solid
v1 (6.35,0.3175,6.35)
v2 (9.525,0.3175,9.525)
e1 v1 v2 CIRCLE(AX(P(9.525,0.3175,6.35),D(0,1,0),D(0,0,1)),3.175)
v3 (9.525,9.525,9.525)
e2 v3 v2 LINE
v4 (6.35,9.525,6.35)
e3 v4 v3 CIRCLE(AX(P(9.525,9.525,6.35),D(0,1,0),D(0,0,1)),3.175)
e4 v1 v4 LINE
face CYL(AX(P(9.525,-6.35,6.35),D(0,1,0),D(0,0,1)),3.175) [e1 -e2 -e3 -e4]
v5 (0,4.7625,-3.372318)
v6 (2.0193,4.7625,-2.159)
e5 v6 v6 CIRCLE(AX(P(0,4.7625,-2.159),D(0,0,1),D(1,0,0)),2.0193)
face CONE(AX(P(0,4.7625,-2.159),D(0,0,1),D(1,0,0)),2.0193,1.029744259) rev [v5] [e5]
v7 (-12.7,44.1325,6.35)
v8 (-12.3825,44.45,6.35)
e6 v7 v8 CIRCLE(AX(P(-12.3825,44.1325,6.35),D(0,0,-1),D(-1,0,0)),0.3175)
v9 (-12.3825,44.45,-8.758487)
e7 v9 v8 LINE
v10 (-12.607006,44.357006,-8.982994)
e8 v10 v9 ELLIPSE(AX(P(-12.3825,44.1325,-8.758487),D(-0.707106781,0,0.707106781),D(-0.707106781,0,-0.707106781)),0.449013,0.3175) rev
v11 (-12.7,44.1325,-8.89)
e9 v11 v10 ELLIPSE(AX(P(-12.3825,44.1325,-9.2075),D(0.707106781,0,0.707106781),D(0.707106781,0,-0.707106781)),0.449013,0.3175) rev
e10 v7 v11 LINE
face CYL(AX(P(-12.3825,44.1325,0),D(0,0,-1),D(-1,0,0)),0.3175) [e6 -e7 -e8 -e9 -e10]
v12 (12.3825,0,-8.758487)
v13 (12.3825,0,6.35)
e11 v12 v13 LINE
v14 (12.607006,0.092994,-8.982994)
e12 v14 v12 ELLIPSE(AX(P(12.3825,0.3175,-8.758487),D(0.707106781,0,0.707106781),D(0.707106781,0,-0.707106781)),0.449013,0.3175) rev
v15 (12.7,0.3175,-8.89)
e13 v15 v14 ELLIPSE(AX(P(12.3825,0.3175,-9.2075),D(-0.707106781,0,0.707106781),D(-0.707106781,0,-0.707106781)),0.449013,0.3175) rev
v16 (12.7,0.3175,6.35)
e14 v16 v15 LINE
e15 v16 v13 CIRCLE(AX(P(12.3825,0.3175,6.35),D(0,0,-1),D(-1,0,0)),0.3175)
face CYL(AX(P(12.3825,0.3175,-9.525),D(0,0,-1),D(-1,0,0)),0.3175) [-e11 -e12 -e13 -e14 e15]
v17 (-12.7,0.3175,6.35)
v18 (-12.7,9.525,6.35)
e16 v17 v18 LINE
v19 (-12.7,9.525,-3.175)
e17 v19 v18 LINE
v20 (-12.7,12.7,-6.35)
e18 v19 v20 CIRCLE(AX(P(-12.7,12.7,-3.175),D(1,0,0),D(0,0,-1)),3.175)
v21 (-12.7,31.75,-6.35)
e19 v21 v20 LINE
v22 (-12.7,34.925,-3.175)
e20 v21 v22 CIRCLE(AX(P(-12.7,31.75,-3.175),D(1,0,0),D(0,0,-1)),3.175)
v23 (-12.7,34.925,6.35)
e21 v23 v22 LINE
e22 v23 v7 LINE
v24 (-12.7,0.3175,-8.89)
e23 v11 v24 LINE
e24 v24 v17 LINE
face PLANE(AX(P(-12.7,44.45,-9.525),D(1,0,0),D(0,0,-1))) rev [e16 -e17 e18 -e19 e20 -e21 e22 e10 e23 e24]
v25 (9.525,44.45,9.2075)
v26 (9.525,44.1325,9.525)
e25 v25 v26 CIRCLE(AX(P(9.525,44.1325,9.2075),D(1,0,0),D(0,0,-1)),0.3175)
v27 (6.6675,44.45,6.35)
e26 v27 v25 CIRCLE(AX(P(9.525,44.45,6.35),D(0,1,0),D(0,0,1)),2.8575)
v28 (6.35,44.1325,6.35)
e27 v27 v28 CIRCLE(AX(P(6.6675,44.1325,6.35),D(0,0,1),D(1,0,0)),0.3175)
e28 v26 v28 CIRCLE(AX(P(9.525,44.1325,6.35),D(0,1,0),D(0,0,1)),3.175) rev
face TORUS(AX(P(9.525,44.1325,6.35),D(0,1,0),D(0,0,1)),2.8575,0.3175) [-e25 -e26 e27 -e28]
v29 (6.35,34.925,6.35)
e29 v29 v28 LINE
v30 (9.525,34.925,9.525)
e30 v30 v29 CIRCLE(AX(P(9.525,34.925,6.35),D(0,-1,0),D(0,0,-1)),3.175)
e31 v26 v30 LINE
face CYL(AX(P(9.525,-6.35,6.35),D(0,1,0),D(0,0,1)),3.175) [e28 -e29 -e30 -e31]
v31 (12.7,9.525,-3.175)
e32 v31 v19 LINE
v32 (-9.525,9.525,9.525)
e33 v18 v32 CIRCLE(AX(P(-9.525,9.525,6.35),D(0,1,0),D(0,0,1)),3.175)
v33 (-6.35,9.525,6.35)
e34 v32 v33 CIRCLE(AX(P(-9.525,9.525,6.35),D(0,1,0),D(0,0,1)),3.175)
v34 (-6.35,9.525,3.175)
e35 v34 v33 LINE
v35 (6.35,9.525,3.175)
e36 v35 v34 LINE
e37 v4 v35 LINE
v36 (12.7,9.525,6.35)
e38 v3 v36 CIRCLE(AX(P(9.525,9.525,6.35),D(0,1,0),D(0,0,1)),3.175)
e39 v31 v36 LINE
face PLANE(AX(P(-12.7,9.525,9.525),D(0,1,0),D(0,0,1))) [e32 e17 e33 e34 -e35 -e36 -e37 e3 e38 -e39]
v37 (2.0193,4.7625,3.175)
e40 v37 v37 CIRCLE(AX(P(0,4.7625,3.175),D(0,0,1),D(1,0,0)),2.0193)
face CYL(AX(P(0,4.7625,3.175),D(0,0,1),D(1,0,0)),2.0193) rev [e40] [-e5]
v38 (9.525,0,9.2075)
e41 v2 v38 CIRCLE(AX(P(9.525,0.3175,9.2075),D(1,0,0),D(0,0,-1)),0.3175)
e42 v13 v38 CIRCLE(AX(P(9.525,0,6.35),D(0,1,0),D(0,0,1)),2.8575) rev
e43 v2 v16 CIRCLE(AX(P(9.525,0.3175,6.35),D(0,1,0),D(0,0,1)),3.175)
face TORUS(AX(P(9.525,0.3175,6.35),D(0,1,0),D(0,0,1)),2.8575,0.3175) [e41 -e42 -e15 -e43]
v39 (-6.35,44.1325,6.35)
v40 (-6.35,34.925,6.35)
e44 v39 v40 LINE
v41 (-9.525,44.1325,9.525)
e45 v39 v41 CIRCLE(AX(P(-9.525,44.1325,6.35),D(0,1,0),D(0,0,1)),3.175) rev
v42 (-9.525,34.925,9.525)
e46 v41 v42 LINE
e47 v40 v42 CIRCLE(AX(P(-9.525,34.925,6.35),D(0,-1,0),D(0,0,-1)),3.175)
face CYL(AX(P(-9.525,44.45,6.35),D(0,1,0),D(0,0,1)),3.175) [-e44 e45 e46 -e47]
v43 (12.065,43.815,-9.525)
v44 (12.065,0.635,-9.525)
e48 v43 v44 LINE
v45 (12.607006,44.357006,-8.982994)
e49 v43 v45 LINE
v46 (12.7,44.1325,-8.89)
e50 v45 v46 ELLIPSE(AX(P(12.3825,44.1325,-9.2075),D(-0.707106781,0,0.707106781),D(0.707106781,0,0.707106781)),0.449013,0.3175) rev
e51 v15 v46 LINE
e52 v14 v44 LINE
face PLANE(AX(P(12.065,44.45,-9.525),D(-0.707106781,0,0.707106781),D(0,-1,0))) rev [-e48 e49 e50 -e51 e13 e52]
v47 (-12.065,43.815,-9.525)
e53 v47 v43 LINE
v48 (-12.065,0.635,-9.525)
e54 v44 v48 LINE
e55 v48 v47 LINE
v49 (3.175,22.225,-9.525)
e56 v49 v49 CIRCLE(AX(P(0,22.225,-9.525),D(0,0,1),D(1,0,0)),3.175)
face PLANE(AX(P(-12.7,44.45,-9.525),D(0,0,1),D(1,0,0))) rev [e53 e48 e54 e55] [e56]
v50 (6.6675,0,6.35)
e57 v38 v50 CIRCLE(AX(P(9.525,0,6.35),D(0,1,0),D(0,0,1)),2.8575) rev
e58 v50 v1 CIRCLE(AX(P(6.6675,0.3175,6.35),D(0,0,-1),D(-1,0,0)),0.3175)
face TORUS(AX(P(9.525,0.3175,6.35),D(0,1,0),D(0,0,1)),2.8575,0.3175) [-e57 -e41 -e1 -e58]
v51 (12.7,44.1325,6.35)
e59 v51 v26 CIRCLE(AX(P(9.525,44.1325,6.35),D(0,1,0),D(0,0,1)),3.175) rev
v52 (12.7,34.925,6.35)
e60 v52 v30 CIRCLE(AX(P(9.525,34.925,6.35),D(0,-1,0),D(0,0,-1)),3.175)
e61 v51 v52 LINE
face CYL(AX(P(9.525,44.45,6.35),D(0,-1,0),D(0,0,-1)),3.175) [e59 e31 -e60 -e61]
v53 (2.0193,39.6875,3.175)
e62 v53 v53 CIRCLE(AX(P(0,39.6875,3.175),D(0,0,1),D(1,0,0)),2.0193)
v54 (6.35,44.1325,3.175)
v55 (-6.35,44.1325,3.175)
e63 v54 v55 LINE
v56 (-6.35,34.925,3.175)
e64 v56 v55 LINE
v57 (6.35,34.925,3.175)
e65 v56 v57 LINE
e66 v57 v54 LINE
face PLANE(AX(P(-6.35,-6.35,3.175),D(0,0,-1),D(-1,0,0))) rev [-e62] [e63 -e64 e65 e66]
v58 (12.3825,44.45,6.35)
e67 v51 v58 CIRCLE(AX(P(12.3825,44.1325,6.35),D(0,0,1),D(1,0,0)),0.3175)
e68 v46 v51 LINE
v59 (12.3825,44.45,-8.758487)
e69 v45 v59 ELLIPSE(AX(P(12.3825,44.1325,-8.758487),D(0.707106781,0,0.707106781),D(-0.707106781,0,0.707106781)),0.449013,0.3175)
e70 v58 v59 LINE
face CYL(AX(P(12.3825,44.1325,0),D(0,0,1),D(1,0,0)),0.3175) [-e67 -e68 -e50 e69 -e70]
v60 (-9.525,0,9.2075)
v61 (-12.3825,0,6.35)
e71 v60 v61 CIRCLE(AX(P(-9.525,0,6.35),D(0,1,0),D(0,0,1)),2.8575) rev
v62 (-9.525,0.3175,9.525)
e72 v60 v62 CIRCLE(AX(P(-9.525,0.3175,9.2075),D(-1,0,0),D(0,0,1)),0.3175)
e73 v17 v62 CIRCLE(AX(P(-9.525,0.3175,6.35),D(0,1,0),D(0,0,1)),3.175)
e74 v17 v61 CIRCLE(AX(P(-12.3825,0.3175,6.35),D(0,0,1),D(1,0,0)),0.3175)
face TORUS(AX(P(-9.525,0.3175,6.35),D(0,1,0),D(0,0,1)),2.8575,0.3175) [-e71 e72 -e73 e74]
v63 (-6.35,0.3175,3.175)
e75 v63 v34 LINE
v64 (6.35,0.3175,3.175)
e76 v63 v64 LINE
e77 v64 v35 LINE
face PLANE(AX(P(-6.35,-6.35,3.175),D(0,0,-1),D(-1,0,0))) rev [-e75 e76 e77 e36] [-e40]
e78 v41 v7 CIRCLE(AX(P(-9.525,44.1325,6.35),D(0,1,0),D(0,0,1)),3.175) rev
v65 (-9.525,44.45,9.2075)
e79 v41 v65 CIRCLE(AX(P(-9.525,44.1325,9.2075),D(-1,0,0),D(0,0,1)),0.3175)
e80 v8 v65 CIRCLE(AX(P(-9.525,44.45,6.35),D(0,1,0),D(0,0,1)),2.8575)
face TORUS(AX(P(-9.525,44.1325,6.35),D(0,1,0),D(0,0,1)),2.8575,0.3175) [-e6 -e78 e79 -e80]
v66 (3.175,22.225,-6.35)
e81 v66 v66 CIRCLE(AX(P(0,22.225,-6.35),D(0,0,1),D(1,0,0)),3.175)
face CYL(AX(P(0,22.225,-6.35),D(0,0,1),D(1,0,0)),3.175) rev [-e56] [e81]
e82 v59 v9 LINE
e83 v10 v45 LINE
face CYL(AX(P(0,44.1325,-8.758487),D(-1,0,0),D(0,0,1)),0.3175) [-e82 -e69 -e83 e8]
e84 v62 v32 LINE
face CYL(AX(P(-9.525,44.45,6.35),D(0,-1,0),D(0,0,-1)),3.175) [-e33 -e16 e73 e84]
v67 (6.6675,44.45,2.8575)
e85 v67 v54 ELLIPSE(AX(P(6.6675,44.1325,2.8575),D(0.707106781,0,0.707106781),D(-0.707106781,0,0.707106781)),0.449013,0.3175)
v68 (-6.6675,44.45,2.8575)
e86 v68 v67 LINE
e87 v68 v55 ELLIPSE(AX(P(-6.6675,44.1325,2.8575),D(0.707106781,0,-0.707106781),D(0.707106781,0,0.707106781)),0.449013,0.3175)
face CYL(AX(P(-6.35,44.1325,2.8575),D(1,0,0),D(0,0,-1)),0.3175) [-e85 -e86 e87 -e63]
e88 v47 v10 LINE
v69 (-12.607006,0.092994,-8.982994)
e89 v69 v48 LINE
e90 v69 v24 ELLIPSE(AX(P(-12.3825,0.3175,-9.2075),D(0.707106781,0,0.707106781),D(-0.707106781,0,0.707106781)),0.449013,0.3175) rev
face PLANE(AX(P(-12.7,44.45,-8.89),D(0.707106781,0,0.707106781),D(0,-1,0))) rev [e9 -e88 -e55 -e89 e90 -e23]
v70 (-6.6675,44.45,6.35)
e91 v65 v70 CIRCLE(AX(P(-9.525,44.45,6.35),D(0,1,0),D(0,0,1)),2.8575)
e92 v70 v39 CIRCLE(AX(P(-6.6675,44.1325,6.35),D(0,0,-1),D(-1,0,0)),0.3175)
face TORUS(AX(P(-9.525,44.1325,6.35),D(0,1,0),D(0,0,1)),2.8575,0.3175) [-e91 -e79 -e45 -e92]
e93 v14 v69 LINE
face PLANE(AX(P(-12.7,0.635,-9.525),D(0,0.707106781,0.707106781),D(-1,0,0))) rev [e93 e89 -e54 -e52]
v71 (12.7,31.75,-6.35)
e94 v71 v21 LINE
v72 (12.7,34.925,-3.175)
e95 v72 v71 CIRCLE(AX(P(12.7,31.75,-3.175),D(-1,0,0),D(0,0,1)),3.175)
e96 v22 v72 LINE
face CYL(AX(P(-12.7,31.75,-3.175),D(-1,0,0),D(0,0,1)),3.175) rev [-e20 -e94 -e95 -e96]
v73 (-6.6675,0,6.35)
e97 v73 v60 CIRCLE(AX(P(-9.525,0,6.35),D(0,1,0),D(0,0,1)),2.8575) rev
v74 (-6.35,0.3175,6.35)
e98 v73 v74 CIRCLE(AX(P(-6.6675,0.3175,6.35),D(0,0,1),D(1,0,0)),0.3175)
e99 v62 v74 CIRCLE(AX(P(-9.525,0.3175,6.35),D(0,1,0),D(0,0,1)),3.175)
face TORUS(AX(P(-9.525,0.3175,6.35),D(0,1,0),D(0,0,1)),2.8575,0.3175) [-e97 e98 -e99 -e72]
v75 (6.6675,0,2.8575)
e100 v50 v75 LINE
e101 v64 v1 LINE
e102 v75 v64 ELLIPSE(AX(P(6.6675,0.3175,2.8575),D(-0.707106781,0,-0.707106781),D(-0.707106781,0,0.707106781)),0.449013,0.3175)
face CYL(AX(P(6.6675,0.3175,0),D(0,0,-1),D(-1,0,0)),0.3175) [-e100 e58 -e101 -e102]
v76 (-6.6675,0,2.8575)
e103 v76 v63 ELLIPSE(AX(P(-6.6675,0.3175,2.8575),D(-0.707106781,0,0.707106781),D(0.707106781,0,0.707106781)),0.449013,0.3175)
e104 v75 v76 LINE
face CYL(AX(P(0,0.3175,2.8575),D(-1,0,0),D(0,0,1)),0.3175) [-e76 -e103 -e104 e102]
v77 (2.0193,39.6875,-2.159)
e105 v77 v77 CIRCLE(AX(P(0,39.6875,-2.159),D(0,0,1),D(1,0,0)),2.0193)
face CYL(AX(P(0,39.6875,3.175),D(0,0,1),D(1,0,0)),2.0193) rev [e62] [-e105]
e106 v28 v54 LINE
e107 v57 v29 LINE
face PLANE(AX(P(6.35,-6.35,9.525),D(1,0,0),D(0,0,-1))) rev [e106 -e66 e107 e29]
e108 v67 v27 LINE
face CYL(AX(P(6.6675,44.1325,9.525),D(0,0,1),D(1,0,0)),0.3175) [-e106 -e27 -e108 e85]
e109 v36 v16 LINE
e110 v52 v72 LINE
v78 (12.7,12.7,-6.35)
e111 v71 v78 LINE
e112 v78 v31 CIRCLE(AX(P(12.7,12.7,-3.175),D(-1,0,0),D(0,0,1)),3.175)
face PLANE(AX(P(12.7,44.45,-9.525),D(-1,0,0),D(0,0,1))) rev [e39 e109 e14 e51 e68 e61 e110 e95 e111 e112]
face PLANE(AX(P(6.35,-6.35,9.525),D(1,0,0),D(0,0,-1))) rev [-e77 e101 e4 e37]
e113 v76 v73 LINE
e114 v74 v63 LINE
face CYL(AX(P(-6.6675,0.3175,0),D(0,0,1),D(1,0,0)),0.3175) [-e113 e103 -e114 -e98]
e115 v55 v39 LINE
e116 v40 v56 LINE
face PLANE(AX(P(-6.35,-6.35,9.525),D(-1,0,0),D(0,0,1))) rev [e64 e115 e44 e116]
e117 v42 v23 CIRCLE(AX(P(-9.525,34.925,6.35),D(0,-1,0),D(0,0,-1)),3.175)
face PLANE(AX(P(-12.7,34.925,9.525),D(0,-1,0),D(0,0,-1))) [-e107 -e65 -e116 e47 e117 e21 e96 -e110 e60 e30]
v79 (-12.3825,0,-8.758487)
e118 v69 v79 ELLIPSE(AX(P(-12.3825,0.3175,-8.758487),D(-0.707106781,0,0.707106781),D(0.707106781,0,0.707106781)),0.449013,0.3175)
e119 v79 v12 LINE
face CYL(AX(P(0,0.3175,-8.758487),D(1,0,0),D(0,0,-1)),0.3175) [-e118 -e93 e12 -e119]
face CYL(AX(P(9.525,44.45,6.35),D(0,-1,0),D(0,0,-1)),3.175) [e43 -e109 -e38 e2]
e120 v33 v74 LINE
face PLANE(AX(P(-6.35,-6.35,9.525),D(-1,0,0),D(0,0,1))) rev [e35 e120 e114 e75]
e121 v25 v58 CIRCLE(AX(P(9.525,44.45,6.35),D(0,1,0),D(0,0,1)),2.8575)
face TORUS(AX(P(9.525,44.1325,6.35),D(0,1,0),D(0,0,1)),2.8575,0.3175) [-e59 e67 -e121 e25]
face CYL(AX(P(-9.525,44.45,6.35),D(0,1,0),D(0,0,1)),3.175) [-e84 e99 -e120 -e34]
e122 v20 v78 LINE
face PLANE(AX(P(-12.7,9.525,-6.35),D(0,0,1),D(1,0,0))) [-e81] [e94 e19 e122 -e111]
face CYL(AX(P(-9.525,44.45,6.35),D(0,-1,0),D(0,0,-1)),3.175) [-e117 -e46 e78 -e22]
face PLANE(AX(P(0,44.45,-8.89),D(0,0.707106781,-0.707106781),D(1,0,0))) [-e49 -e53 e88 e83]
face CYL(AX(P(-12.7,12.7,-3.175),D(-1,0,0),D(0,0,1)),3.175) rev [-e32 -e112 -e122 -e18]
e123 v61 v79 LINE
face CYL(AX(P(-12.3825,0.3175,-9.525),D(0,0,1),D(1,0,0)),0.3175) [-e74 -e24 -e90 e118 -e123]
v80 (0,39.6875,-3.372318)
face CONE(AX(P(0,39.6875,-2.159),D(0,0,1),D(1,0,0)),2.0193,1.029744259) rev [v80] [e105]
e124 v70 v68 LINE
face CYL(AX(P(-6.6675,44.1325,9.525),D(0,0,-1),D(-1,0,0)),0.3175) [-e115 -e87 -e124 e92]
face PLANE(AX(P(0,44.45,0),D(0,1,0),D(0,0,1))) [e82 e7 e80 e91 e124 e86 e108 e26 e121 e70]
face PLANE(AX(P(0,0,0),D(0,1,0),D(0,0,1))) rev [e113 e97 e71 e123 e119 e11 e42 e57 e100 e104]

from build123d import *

# Parameters (mm, degrees)
SKETCH1_W                       = 25.4
SKETCH1_H                       = 19.05
BOSS_EXTRUDE1_DEPTH             = 44.45
SKETCH2_W                       = 25.4
SKETCH2_H                       = 15.875
CUT_EXTRUDE4_DEPTH              = 38.162422217
SKETCH3_W                       = 12.7
SKETCH3_H                       = 6.35
CUT_EXTRUDE5_DEPTH              = 50.8
FILLET1_R                       = 3.175
F_10_32_TAPPED_HOLE1_D          = 4.0386
F_10_32_TAPPED_HOLE1_DEPTH      = 5.334
F_10_32_TAPPED_HOLE1_TIP        = 1.213317848
CHAMFER1_SIZE                   = 0.635
F_1_4_0_25_DIAMETER_HOLE1_D     = 6.35
F_1_4_0_25_DIAMETER_HOLE1_DEPTH = 31.242
F_1_4_0_25_DIAMETER_HOLE1_TIP   = 1.907732465
FILLET2_R                       = 0.3175
FILLET3_R                       = 3.175


# Some blends are built 0.0001 mm under size
with BuildPart() as part:
    # Sketch1 → Boss-Extrude1 (new body)
    with BuildSketch(Plane(origin=(0, 0, 0), x_dir=(1, 0, 0), z_dir=(0, 1, 0))):
        Rectangle(SKETCH1_W, SKETCH1_H)
    extrude(amount=BOSS_EXTRUDE1_DEPTH)

    # Sketch2 → Cut-Extrude4 (cut, through all)
    with BuildSketch(Plane(origin=(12.7, 25.4, 0), x_dir=(0, 1, 0), z_dir=(-1, 0, 0))):
        with Locations((-3.175, -1.5875)):
            Rectangle(SKETCH2_W, SKETCH2_H)
    extrude(amount=CUT_EXTRUDE4_DEPTH, mode=Mode.SUBTRACT)

    # Sketch3 → Cut-Extrude5 (cut)
    with BuildSketch(Plane(origin=(0, 44.45, 0), x_dir=(1, 0, 0), z_dir=(0, 1, 0))):
        with Locations((0, -6.35)):
            Rectangle(SKETCH3_W, SKETCH3_H)
    extrude(amount=-CUT_EXTRUDE5_DEPTH, mode=Mode.SUBTRACT)

    # Fillet1
    fillet1_edges = [part.edges().sort_by_distance(p)[0] for p in [
        (-12.7, 39.6875, 9.525),
        (-12.7, 4.7625, 9.525),
        (-6.35, 4.7625, 9.525),
        (12.7, 4.7625, 9.525),
        (6.35, 4.7625, 9.525),
        (12.7, 39.6875, 9.525),
        (6.35, 39.6875, 9.525),
        (-6.35, 39.6875, 9.525),
    ]]
    fillet(fillet1_edges, radius=FILLET1_R - 0.0001)  # a hair under: the kernel refuses the full size

    # #10-32 Tapped Hole1
    with Locations(Plane.XY.offset(3.175)):
        with Locations((0, 39.6875), (0, 4.7625)):
            Hole(F_10_32_TAPPED_HOLE1_D / 2, depth=F_10_32_TAPPED_HOLE1_DEPTH)
            with Locations((0, 0, -(F_10_32_TAPPED_HOLE1_DEPTH + F_10_32_TAPPED_HOLE1_TIP / 2))):  # 118° drill point
                Cone(0, F_10_32_TAPPED_HOLE1_D / 2, F_10_32_TAPPED_HOLE1_TIP, mode=Mode.SUBTRACT)

    # Chamfer1
    chamfer1_edges = [part.edges().sort_by_distance(p)[0] for p in [
        (0, 0, -9.525),
        (0, 44.45, -9.525),
        (-12.7, 22.225, -9.525),
        (12.7, 22.225, -9.525),
    ]]
    chamfer(chamfer1_edges, length=CHAMFER1_SIZE)

    # 1/4 (0.25) Diameter Hole1
    with Locations(Plane.XY.offset(-6.35)):
        with Locations((0, 22.225)):
            Hole(F_1_4_0_25_DIAMETER_HOLE1_D / 2, depth=F_1_4_0_25_DIAMETER_HOLE1_DEPTH)
            with Locations((0, 0, -(F_1_4_0_25_DIAMETER_HOLE1_DEPTH + F_1_4_0_25_DIAMETER_HOLE1_TIP / 2))):  # 118° drill point
                Cone(0, F_1_4_0_25_DIAMETER_HOLE1_D / 2, F_1_4_0_25_DIAMETER_HOLE1_TIP, mode=Mode.SUBTRACT)

    # Fillet2
    # the kernel refuses this fillet: 0.3175 mm, written as the material it takes off along each edge
    with BuildSketch(Plane(origin=(-12.7, 44.45, 6.3501), x_dir=(0, -1, 0), z_dir=(0, 0, -1)), Plane(origin=(12.7, 0, -9.68375), x_dir=(-1, 0, 0), z_dir=(0, 0, 1))) as fillet2_piece_1:
        with BuildLine():
            CenterArc((FILLET2_R, -FILLET2_R), FILLET2_R, 90, 90)
            Line((0, -FILLET2_R), (0, 0))
            Line((0, 0), (FILLET2_R, 0))
        make_face()
    extrude(amount=16.03385, mode=Mode.SUBTRACT)
    with BuildSketch(Plane(origin=(-13.028782015, 44.45, -8.89), x_dir=(0, 0, 1), z_dir=(1, 0, 0))) as fillet2_piece_2:
        with BuildLine():
            CenterArc((FILLET2_R * 0.414213562373, FILLET2_R), FILLET2_R, 225, 45)
            Line((-FILLET2_R * 0.292893218813, FILLET2_R * 0.292893218813), (0, 0))
            Line((0, 0), (FILLET2_R * 0.414213562373, 0))
        make_face()
    extrude(amount=26.05756403, mode=Mode.SUBTRACT)
    with BuildSketch(Plane(origin=(-12.7, 0, 6.3501), x_dir=(0, 1, 0), z_dir=(0, 0, -1)), Plane(origin=(12.7, 44.45, -9.68375), x_dir=(-1, 0, 0), z_dir=(0, 0, 1))) as fillet2_piece_3:
        with BuildLine():
            CenterArc((FILLET2_R, FILLET2_R), FILLET2_R, 180, 90)
            Line((0, FILLET2_R), (0, 0))
            Line((0, 0), (FILLET2_R, 0))
        make_face()
    extrude(amount=16.03385, mode=Mode.SUBTRACT)
    with BuildSketch(Plane(origin=(-13.028782015, 0, -8.89), x_dir=(0, 0, 1), z_dir=(1, 0, 0))) as fillet2_piece_4:
        with BuildLine():
            CenterArc((FILLET2_R * 0.414213562373, -FILLET2_R), FILLET2_R, 90, 45)
            Line((-FILLET2_R * 0.292893218813, -FILLET2_R * 0.292893218813), (0, 0))
            Line((0, 0), (FILLET2_R * 0.414213562373, 0))
        make_face()
    extrude(amount=26.05756403, mode=Mode.SUBTRACT)
    with BuildSketch(Plane(origin=(-6.35, 0, 6.3501), x_dir=(-1, 0, 0), z_dir=(0, 0, -1)), Plane(origin=(-6.35, 44.45, 3.175), x_dir=(-1, 0, 0), z_dir=(0, 0, 1)), Plane(origin=(6.35, 0, 3.175), x_dir=(1, 0, 0), z_dir=(0, 0, 1)), Plane(origin=(6.35, 44.45, 6.3501), x_dir=(1, 0, 0), z_dir=(0, 0, -1))) as fillet2_piece_5:
        with BuildLine():
            CenterArc((FILLET2_R, FILLET2_R), FILLET2_R, 180, 90)
            Line((0, FILLET2_R), (0, 0))
            Line((0, 0), (FILLET2_R, 0))
        make_face()
    extrude(amount=3.1751, mode=Mode.SUBTRACT)
    with BuildSketch(Plane(origin=(-6.35, 0, 3.175), x_dir=(0, 0, -1), z_dir=(1, 0, 0)), Plane(origin=(6.35, 44.45, 3.175), x_dir=(0, 0, -1), z_dir=(-1, 0, 0))) as fillet2_piece_6:
        with BuildLine():
            CenterArc((FILLET2_R, FILLET2_R), FILLET2_R, 180, 90)
            Line((0, FILLET2_R), (0, 0))
            Line((0, 0), (FILLET2_R, 0))
        make_face()
    extrude(amount=12.7, mode=Mode.SUBTRACT)
    with BuildSketch(Plane(origin=(9.5249, 0, 6.3501), x_dir=(0, 0, 1), z_dir=(1, 0, 0))) as fillet2_piece_7:
        with BuildLine():
            CenterArc((3.1749 - FILLET2_R, -FILLET2_R), FILLET2_R, 360, 90)
            Line((3.1749, -FILLET2_R), (3.1749, 0))
            Line((3.1749, 0), (3.1749 - FILLET2_R, 0))
        make_face()
    revolve(axis=Axis((9.5249, 0, 6.3501), (0, -1, 0)), revolution_arc=90, mode=Mode.SUBTRACT)
    with BuildSketch(Plane(origin=(9.5251, 0, 6.3501), x_dir=(1, 0, 0), z_dir=(0, 0, -1))) as fillet2_piece_8:
        with BuildLine():
            CenterArc((3.1749 - FILLET2_R, -FILLET2_R), FILLET2_R, 0, 90)
            Line((3.1749, -FILLET2_R), (3.1749, 0))
            Line((3.1749, 0), (3.1749 - FILLET2_R, 0))
        make_face()
    revolve(axis=Axis((9.5251, 0, 6.3501), (0, -1, 0)), revolution_arc=90, mode=Mode.SUBTRACT)
    with BuildSketch(Plane(origin=(-9.5249, 0, 6.3501), x_dir=(0, 0, 1), z_dir=(-1, 0, 0))) as fillet2_piece_9:
        with BuildLine():
            CenterArc((3.1749 - FILLET2_R, FILLET2_R), FILLET2_R, 270, 90)
            Line((3.1749, FILLET2_R), (3.1749, 0))
            Line((3.1749, 0), (3.1749 - FILLET2_R, 0))
        make_face()
    revolve(axis=Axis((-9.5249, 0, 6.3501), (0, 1, 0)), revolution_arc=90, mode=Mode.SUBTRACT)
    with BuildSketch(Plane(origin=(-9.5251, 0, 6.3501), x_dir=(-1, 0, 0), z_dir=(0, 0, -1))) as fillet2_piece_10:
        with BuildLine():
            CenterArc((3.1749 - FILLET2_R, FILLET2_R), FILLET2_R, 270, 90)
            Line((3.1749, FILLET2_R), (3.1749, 0))
            Line((3.1749, 0), (3.1749 - FILLET2_R, 0))
        make_face()
    revolve(axis=Axis((-9.5251, 0, 6.3501), (0, 1, 0)), revolution_arc=90, mode=Mode.SUBTRACT)
    with BuildSketch(Plane(origin=(-9.5251, 44.45, 6.3501), x_dir=(-1, 0, 0), z_dir=(0, 0, -1))) as fillet2_piece_11:
        with BuildLine():
            CenterArc((3.1749 - FILLET2_R, -FILLET2_R), FILLET2_R, 0, 90)
            Line((3.1749, -FILLET2_R), (3.1749, 0))
            Line((3.1749, 0), (3.1749 - FILLET2_R, 0))
        make_face()
    revolve(axis=Axis((-9.5251, 44.45, 6.3501), (0, 1, 0)), revolution_arc=90, mode=Mode.SUBTRACT)
    with BuildSketch(Plane(origin=(-9.5249, 44.45, 6.3501), x_dir=(0, 0, 1), z_dir=(-1, 0, 0))) as fillet2_piece_12:
        with BuildLine():
            CenterArc((3.1749 - FILLET2_R, -FILLET2_R), FILLET2_R, 0, 90)
            Line((3.1749, -FILLET2_R), (3.1749, 0))
            Line((3.1749, 0), (3.1749 - FILLET2_R, 0))
        make_face()
    revolve(axis=Axis((-9.5249, 44.45, 6.3501), (0, 1, 0)), revolution_arc=90, mode=Mode.SUBTRACT)
    with BuildSketch(Plane(origin=(9.5249, 44.45, 6.3501), x_dir=(0, 0, 1), z_dir=(1, 0, 0))) as fillet2_piece_13:
        with BuildLine():
            CenterArc((3.1749 - FILLET2_R, FILLET2_R), FILLET2_R, 270, 90)
            Line((3.1749, FILLET2_R), (3.1749, 0))
            Line((3.1749, 0), (3.1749 - FILLET2_R, 0))
        make_face()
    revolve(axis=Axis((9.5249, 44.45, 6.3501), (0, -1, 0)), revolution_arc=90, mode=Mode.SUBTRACT)
    with BuildSketch(Plane(origin=(9.5251, 44.45, 6.3501), x_dir=(1, 0, 0), z_dir=(0, 0, -1))) as fillet2_piece_14:
        with BuildLine():
            CenterArc((3.1749 - FILLET2_R, FILLET2_R), FILLET2_R, 270, 90)
            Line((3.1749, FILLET2_R), (3.1749, 0))
            Line((3.1749, 0), (3.1749 - FILLET2_R, 0))
        make_face()
    revolve(axis=Axis((9.5251, 44.45, 6.3501), (0, -1, 0)), revolution_arc=90, mode=Mode.SUBTRACT)
    with BuildSketch(Plane(origin=(9.5251, 44.45, 9.525), x_dir=(0, 0, -1), z_dir=(-1, 0, 0)), Plane(origin=(-9.5249, 44.45, 9.525), x_dir=(0, 0, -1), z_dir=(-1, 0, 0))) as fillet2_piece_15:
        with BuildLine():
            CenterArc((FILLET2_R, FILLET2_R), FILLET2_R, 180, 90)
            Line((0, FILLET2_R), (0, 0))
            Line((0, 0), (FILLET2_R, 0))
        make_face()
    extrude(amount=0.0002, mode=Mode.SUBTRACT)
    with BuildSketch(Plane(origin=(-9.5249, 0, 9.525), x_dir=(0, 0, -1), z_dir=(-1, 0, 0)), Plane(origin=(9.5251, 0, 9.525), x_dir=(0, 0, -1), z_dir=(-1, 0, 0))) as fillet2_piece_16:
        with BuildLine():
            CenterArc((FILLET2_R, -FILLET2_R), FILLET2_R, 90, 90)
            Line((0, -FILLET2_R), (0, 0))
            Line((0, 0), (FILLET2_R, 0))
        make_face()
    extrude(amount=0.0002, mode=Mode.SUBTRACT)
    with BuildSketch(Plane(origin=(-6.35, 0, 6.3501), x_dir=(-1, 0, 0), z_dir=(0, 0, -1))) as fillet2_piece_17a_section:
        with BuildLine():
            CenterArc((FILLET2_R, FILLET2_R), FILLET2_R, 180, 90)
            Line((0, FILLET2_R), (0, 0))
            Line((0, 0), (FILLET2_R, 0))
        make_face()
    fillet2_piece_17a = extrude(amount=3.96885, mode=Mode.PRIVATE)
    fillet2_piece_17a = split(fillet2_piece_17a, bisect_by=Plane(origin=(-6.421880449, 0.071880449, 3.175), z_dir=(0, 0, -1)), keep=Keep.TOP, mode=Mode.PRIVATE)
    with BuildSketch(Plane(origin=(-7.14375, 0, 3.175), x_dir=(0, 0, -1), z_dir=(1, 0, 0))) as fillet2_piece_17b_section:
        with BuildLine():
            CenterArc((FILLET2_R, FILLET2_R), FILLET2_R, 180, 90)
            Line((0, FILLET2_R), (0, 0))
            Line((0, 0), (FILLET2_R, 0))
        make_face()
    fillet2_piece_17b = extrude(amount=13.49375, mode=Mode.PRIVATE)
    fillet2_piece_17b = split(fillet2_piece_17b, bisect_by=Plane(origin=(-6.35, 0.071880449, 3.103119551), z_dir=(-1, 0, 0)), keep=Keep.TOP, mode=Mode.PRIVATE)
    fillet2_piece_17 = fillet2_piece_17a & fillet2_piece_17b
    add(fillet2_piece_17, mode=Mode.SUBTRACT)
    with BuildSketch(Plane(origin=(-6.35, 0, 3.175), x_dir=(0, 0, -1), z_dir=(1, 0, 0))) as fillet2_piece_18a_section:
        with BuildLine():
            CenterArc((FILLET2_R, FILLET2_R), FILLET2_R, 180, 90)
            Line((0, FILLET2_R), (0, 0))
            Line((0, 0), (FILLET2_R, 0))
        make_face()
    fillet2_piece_18a = extrude(amount=13.49375, mode=Mode.PRIVATE)
    fillet2_piece_18a = split(fillet2_piece_18a, bisect_by=Plane(origin=(6.35, 0.071880449, 3.103119551), z_dir=(1, 0, 0)), keep=Keep.TOP, mode=Mode.PRIVATE)
    with BuildSketch(Plane(origin=(6.35, 0, 2.38125), x_dir=(1, 0, 0), z_dir=(0, 0, 1))) as fillet2_piece_18b_section:
        with BuildLine():
            CenterArc((FILLET2_R, FILLET2_R), FILLET2_R, 180, 90)
            Line((0, FILLET2_R), (0, 0))
            Line((0, 0), (FILLET2_R, 0))
        make_face()
    fillet2_piece_18b = extrude(amount=3.96885, mode=Mode.PRIVATE)
    fillet2_piece_18b = split(fillet2_piece_18b, bisect_by=Plane(origin=(6.421880449, 0.071880449, 3.175), z_dir=(0, 0, -1)), keep=Keep.TOP, mode=Mode.PRIVATE)
    fillet2_piece_18 = fillet2_piece_18a & fillet2_piece_18b
    add(fillet2_piece_18, mode=Mode.SUBTRACT)
    with BuildSketch(Plane(origin=(-6.35, 44.45, 2.38125), x_dir=(-1, 0, 0), z_dir=(0, 0, 1))) as fillet2_piece_19a_section:
        with BuildLine():
            CenterArc((FILLET2_R, FILLET2_R), FILLET2_R, 180, 90)
            Line((0, FILLET2_R), (0, 0))
            Line((0, 0), (FILLET2_R, 0))
        make_face()
    fillet2_piece_19a = extrude(amount=3.96885, mode=Mode.PRIVATE)
    fillet2_piece_19a = split(fillet2_piece_19a, bisect_by=Plane(origin=(-6.421880449, 44.378119551, 3.175), z_dir=(0, 0, -1)), keep=Keep.TOP, mode=Mode.PRIVATE)
    with BuildSketch(Plane(origin=(6.35, 44.45, 3.175), x_dir=(0, 0, -1), z_dir=(-1, 0, 0))) as fillet2_piece_19b_section:
        with BuildLine():
            CenterArc((FILLET2_R, FILLET2_R), FILLET2_R, 180, 90)
            Line((0, FILLET2_R), (0, 0))
            Line((0, 0), (FILLET2_R, 0))
        make_face()
    fillet2_piece_19b = extrude(amount=13.49375, mode=Mode.PRIVATE)
    fillet2_piece_19b = split(fillet2_piece_19b, bisect_by=Plane(origin=(-6.35, 44.378119551, 3.103119551), z_dir=(-1, 0, 0)), keep=Keep.TOP, mode=Mode.PRIVATE)
    fillet2_piece_19 = fillet2_piece_19a & fillet2_piece_19b
    add(fillet2_piece_19, mode=Mode.SUBTRACT)
    with BuildSketch(Plane(origin=(7.14375, 44.45, 3.175), x_dir=(0, 0, -1), z_dir=(-1, 0, 0))) as fillet2_piece_20a_section:
        with BuildLine():
            CenterArc((FILLET2_R, FILLET2_R), FILLET2_R, 180, 90)
            Line((0, FILLET2_R), (0, 0))
            Line((0, 0), (FILLET2_R, 0))
        make_face()
    fillet2_piece_20a = extrude(amount=13.49375, mode=Mode.PRIVATE)
    fillet2_piece_20a = split(fillet2_piece_20a, bisect_by=Plane(origin=(6.35, 44.378119551, 3.103119551), z_dir=(1, 0, 0)), keep=Keep.TOP, mode=Mode.PRIVATE)
    with BuildSketch(Plane(origin=(6.35, 44.45, 6.3501), x_dir=(1, 0, 0), z_dir=(0, 0, -1))) as fillet2_piece_20b_section:
        with BuildLine():
            CenterArc((FILLET2_R, FILLET2_R), FILLET2_R, 180, 90)
            Line((0, FILLET2_R), (0, 0))
            Line((0, 0), (FILLET2_R, 0))
        make_face()
    fillet2_piece_20b = extrude(amount=3.96885, mode=Mode.PRIVATE)
    fillet2_piece_20b = split(fillet2_piece_20b, bisect_by=Plane(origin=(6.421880449, 44.378119551, 3.175), z_dir=(0, 0, -1)), keep=Keep.TOP, mode=Mode.PRIVATE)
    fillet2_piece_20 = fillet2_piece_20a & fillet2_piece_20b
    add(fillet2_piece_20, mode=Mode.SUBTRACT)

    # Fillet3
    fillet3_edges = [part.edges().sort_by_distance(p)[0] for p in [
        (0, 9.525, -6.35),
        (0, 34.925, -6.35),
    ]]
    fillet(fillet3_edges, radius=FILLET3_R)


solid = part.part
